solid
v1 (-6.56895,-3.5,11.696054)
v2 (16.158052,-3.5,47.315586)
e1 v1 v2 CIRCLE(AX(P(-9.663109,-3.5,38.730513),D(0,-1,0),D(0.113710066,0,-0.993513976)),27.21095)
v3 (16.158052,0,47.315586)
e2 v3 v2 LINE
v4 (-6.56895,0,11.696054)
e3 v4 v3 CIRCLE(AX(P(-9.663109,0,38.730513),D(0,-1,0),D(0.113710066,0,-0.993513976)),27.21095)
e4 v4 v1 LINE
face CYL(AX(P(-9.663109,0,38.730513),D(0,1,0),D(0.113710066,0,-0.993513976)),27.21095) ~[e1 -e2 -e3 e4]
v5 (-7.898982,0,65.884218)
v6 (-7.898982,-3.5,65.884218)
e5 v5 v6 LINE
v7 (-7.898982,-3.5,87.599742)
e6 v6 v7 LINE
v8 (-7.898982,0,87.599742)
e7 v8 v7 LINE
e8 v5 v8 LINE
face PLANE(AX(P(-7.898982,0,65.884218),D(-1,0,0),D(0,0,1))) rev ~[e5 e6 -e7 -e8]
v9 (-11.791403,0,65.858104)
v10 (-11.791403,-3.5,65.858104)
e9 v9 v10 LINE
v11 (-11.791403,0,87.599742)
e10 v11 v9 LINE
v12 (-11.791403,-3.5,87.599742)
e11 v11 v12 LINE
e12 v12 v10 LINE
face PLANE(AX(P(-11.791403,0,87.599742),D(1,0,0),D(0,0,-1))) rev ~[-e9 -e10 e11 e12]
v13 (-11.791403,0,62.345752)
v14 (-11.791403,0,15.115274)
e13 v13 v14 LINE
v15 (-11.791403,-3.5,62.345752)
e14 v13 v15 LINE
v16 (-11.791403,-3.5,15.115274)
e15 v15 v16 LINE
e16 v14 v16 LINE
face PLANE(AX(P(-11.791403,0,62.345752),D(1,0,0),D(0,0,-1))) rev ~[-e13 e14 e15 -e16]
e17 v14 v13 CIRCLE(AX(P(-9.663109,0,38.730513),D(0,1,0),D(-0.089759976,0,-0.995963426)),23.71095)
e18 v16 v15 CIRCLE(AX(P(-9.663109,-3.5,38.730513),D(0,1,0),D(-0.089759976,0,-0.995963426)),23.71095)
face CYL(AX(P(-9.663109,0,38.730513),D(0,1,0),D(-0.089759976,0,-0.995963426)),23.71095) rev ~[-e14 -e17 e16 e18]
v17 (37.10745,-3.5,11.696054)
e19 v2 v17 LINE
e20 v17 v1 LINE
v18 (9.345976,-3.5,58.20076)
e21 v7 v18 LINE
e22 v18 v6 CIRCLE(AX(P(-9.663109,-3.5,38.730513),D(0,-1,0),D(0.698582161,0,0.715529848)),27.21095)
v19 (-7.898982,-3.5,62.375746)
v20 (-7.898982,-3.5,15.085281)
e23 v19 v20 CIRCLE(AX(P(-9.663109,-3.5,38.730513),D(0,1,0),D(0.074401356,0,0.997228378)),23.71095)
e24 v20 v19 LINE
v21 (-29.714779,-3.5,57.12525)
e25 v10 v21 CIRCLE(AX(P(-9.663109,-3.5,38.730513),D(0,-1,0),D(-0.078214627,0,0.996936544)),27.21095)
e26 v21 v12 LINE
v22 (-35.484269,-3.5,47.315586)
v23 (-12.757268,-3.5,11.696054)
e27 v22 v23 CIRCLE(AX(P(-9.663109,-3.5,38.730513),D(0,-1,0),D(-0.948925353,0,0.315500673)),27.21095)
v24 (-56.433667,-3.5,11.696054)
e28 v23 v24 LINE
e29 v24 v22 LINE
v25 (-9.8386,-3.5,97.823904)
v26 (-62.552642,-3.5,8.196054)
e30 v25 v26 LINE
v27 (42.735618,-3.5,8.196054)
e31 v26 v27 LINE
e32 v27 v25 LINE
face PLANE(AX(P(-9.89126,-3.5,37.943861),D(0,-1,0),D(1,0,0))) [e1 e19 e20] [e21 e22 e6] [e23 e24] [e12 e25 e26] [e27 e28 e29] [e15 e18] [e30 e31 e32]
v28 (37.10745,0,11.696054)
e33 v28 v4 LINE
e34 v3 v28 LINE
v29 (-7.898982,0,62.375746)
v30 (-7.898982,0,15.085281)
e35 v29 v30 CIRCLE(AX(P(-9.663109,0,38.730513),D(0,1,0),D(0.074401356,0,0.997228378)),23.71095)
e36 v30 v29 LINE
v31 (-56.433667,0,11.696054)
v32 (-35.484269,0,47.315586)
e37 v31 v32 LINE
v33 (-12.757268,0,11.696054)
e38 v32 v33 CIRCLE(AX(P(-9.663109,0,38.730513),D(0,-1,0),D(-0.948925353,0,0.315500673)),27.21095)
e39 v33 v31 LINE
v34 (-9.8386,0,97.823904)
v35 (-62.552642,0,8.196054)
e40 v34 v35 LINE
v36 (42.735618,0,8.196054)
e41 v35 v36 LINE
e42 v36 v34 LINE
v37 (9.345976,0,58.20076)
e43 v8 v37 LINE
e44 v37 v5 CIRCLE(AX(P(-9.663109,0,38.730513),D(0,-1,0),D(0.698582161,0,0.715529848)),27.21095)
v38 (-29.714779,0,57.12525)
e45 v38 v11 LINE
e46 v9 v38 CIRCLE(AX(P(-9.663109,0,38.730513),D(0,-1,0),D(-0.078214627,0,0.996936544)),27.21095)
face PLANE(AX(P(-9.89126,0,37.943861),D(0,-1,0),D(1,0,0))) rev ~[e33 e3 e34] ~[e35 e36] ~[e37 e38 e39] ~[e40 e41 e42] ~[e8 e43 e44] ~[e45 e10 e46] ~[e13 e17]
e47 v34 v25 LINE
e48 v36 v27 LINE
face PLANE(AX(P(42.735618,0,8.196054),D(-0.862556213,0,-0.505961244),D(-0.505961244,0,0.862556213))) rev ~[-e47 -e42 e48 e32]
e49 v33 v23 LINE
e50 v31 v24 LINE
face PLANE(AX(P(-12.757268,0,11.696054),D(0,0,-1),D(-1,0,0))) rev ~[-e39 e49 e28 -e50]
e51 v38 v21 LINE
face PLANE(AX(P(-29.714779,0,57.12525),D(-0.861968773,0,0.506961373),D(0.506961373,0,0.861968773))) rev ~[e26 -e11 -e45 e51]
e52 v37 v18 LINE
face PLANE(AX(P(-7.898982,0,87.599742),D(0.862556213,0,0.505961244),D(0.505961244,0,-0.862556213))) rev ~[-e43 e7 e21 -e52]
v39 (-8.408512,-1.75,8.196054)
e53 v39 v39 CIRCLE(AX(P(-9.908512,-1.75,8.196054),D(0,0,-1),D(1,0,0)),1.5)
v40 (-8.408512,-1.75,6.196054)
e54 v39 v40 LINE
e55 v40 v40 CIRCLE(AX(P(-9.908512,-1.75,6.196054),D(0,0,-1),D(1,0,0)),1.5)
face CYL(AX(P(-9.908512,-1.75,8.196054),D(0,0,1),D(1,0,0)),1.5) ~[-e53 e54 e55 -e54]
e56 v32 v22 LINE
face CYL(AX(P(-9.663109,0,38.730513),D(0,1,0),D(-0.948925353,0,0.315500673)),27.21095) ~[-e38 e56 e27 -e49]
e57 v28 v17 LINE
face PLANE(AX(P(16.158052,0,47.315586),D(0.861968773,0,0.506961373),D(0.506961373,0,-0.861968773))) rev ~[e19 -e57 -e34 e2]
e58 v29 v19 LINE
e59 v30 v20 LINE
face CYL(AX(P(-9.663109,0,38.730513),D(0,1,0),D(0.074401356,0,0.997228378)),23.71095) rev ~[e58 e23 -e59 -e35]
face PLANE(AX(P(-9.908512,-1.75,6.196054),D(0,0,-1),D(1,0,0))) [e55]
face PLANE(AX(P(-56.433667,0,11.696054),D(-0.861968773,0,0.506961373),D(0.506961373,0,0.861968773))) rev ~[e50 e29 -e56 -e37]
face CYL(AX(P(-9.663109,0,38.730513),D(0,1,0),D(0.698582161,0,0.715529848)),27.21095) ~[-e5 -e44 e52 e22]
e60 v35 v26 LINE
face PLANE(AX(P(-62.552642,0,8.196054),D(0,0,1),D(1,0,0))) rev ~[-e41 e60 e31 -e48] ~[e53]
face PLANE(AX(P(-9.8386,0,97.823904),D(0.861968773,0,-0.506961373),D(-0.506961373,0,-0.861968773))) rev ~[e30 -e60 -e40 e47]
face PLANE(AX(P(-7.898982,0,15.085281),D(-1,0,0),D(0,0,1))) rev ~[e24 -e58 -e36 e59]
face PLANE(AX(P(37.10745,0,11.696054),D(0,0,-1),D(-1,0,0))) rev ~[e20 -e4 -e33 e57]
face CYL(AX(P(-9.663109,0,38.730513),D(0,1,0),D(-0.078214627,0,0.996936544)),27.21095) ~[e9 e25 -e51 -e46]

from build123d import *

# Parameters (mm, degrees)
F1_DEPTH = 3.5
F2_R     = 1.5
F3_DEPTH = 2


# Not quite as in the source:
# - a feature names something its author has since deleted; it is built from what else it names


with BuildPart() as f1:
    # F0 (on Front) → F1 (new body)
    with BuildSketch(Plane.XZ):
        Polygon((42.7356177972, 8.1960540903), (-9.8386000647, 97.8239037067), (-62.5526416078, 8.1960540903), align=None)
        with BuildLine():
            Line((-12.7572676559, 11.6960540903), (-56.4336672666, 11.6960540903))
            Line((-56.4336672666, 11.6960540903), (-35.4842691453, 47.3155863706))
            ThreePointArc((-35.4842691453, 47.3155863706), (-32.6024132797, 24.0941164977), (-12.7572676559, 11.6960540903))
        make_face(mode=Mode.SUBTRACT)
        with BuildLine():
            ThreePointArc((-11.7914030425, 15.1152742164), (-33.3740588193, 38.7305133045), (-11.7914030425, 62.3457523925))
            Line((-11.7914030425, 62.3457523925), (-11.7914030425, 15.1152742164))
        make_face(mode=Mode.SUBTRACT)
        with BuildLine():
            ThreePointArc((-6.5689498166, 11.6960540903), (13.2761958072, 24.0941164977), (16.1580516728, 47.3155863706))
            Line((16.1580516728, 47.3155863706), (37.1074497941, 11.6960540903))
            Line((37.1074497941, 11.6960540903), (-6.5689498166, 11.6960540903))
        make_face(mode=Mode.SUBTRACT)
        with BuildLine():
            ThreePointArc((-7.8989818992, 62.3757456007), (14.0478413468, 38.7305133045), (-7.8989818992, 15.0852810082))
            Line((-7.8989818992, 15.0852810082), (-7.8989818992, 62.3757456007))
        make_face(mode=Mode.SUBTRACT)
        with BuildLine():
            Line((-29.7147789735, 57.1252496473), (-11.7914030425, 87.5997417472))
            Line((-11.7914030425, 87.5997417472), (-11.7914030425, 65.8581038309))
            ThreePointArc((-11.7914030425, 65.8581038309), (-21.5817241061, 63.1923695727), (-29.7147789735, 57.1252496473))
        make_face(mode=Mode.SUBTRACT)
        with BuildLine():
            Line((-7.8989818992, 65.8842176728), (-7.8989818992, 87.5997417472))
            Line((-7.8989818992, 87.5997417472), (9.3459755849, 58.2007602904))
            ThreePointArc((9.3459755849, 58.2007602904), (1.4112063573, 63.5860026304), (-7.8989818992, 65.8842176728))
        make_face(mode=Mode.SUBTRACT)
    extrude(amount=F1_DEPTH)

    # F2 (on face) → F3 (join)
    with BuildSketch(Plane(origin=(0, 0, 8.1960540903), x_dir=(1, 0, 0), z_dir=(0, 0, -1))):
        with Locations((-9.9085119053, 1.75)):
            Circle(F2_R)
    extrude(amount=F3_DEPTH)


solid = f1.part
